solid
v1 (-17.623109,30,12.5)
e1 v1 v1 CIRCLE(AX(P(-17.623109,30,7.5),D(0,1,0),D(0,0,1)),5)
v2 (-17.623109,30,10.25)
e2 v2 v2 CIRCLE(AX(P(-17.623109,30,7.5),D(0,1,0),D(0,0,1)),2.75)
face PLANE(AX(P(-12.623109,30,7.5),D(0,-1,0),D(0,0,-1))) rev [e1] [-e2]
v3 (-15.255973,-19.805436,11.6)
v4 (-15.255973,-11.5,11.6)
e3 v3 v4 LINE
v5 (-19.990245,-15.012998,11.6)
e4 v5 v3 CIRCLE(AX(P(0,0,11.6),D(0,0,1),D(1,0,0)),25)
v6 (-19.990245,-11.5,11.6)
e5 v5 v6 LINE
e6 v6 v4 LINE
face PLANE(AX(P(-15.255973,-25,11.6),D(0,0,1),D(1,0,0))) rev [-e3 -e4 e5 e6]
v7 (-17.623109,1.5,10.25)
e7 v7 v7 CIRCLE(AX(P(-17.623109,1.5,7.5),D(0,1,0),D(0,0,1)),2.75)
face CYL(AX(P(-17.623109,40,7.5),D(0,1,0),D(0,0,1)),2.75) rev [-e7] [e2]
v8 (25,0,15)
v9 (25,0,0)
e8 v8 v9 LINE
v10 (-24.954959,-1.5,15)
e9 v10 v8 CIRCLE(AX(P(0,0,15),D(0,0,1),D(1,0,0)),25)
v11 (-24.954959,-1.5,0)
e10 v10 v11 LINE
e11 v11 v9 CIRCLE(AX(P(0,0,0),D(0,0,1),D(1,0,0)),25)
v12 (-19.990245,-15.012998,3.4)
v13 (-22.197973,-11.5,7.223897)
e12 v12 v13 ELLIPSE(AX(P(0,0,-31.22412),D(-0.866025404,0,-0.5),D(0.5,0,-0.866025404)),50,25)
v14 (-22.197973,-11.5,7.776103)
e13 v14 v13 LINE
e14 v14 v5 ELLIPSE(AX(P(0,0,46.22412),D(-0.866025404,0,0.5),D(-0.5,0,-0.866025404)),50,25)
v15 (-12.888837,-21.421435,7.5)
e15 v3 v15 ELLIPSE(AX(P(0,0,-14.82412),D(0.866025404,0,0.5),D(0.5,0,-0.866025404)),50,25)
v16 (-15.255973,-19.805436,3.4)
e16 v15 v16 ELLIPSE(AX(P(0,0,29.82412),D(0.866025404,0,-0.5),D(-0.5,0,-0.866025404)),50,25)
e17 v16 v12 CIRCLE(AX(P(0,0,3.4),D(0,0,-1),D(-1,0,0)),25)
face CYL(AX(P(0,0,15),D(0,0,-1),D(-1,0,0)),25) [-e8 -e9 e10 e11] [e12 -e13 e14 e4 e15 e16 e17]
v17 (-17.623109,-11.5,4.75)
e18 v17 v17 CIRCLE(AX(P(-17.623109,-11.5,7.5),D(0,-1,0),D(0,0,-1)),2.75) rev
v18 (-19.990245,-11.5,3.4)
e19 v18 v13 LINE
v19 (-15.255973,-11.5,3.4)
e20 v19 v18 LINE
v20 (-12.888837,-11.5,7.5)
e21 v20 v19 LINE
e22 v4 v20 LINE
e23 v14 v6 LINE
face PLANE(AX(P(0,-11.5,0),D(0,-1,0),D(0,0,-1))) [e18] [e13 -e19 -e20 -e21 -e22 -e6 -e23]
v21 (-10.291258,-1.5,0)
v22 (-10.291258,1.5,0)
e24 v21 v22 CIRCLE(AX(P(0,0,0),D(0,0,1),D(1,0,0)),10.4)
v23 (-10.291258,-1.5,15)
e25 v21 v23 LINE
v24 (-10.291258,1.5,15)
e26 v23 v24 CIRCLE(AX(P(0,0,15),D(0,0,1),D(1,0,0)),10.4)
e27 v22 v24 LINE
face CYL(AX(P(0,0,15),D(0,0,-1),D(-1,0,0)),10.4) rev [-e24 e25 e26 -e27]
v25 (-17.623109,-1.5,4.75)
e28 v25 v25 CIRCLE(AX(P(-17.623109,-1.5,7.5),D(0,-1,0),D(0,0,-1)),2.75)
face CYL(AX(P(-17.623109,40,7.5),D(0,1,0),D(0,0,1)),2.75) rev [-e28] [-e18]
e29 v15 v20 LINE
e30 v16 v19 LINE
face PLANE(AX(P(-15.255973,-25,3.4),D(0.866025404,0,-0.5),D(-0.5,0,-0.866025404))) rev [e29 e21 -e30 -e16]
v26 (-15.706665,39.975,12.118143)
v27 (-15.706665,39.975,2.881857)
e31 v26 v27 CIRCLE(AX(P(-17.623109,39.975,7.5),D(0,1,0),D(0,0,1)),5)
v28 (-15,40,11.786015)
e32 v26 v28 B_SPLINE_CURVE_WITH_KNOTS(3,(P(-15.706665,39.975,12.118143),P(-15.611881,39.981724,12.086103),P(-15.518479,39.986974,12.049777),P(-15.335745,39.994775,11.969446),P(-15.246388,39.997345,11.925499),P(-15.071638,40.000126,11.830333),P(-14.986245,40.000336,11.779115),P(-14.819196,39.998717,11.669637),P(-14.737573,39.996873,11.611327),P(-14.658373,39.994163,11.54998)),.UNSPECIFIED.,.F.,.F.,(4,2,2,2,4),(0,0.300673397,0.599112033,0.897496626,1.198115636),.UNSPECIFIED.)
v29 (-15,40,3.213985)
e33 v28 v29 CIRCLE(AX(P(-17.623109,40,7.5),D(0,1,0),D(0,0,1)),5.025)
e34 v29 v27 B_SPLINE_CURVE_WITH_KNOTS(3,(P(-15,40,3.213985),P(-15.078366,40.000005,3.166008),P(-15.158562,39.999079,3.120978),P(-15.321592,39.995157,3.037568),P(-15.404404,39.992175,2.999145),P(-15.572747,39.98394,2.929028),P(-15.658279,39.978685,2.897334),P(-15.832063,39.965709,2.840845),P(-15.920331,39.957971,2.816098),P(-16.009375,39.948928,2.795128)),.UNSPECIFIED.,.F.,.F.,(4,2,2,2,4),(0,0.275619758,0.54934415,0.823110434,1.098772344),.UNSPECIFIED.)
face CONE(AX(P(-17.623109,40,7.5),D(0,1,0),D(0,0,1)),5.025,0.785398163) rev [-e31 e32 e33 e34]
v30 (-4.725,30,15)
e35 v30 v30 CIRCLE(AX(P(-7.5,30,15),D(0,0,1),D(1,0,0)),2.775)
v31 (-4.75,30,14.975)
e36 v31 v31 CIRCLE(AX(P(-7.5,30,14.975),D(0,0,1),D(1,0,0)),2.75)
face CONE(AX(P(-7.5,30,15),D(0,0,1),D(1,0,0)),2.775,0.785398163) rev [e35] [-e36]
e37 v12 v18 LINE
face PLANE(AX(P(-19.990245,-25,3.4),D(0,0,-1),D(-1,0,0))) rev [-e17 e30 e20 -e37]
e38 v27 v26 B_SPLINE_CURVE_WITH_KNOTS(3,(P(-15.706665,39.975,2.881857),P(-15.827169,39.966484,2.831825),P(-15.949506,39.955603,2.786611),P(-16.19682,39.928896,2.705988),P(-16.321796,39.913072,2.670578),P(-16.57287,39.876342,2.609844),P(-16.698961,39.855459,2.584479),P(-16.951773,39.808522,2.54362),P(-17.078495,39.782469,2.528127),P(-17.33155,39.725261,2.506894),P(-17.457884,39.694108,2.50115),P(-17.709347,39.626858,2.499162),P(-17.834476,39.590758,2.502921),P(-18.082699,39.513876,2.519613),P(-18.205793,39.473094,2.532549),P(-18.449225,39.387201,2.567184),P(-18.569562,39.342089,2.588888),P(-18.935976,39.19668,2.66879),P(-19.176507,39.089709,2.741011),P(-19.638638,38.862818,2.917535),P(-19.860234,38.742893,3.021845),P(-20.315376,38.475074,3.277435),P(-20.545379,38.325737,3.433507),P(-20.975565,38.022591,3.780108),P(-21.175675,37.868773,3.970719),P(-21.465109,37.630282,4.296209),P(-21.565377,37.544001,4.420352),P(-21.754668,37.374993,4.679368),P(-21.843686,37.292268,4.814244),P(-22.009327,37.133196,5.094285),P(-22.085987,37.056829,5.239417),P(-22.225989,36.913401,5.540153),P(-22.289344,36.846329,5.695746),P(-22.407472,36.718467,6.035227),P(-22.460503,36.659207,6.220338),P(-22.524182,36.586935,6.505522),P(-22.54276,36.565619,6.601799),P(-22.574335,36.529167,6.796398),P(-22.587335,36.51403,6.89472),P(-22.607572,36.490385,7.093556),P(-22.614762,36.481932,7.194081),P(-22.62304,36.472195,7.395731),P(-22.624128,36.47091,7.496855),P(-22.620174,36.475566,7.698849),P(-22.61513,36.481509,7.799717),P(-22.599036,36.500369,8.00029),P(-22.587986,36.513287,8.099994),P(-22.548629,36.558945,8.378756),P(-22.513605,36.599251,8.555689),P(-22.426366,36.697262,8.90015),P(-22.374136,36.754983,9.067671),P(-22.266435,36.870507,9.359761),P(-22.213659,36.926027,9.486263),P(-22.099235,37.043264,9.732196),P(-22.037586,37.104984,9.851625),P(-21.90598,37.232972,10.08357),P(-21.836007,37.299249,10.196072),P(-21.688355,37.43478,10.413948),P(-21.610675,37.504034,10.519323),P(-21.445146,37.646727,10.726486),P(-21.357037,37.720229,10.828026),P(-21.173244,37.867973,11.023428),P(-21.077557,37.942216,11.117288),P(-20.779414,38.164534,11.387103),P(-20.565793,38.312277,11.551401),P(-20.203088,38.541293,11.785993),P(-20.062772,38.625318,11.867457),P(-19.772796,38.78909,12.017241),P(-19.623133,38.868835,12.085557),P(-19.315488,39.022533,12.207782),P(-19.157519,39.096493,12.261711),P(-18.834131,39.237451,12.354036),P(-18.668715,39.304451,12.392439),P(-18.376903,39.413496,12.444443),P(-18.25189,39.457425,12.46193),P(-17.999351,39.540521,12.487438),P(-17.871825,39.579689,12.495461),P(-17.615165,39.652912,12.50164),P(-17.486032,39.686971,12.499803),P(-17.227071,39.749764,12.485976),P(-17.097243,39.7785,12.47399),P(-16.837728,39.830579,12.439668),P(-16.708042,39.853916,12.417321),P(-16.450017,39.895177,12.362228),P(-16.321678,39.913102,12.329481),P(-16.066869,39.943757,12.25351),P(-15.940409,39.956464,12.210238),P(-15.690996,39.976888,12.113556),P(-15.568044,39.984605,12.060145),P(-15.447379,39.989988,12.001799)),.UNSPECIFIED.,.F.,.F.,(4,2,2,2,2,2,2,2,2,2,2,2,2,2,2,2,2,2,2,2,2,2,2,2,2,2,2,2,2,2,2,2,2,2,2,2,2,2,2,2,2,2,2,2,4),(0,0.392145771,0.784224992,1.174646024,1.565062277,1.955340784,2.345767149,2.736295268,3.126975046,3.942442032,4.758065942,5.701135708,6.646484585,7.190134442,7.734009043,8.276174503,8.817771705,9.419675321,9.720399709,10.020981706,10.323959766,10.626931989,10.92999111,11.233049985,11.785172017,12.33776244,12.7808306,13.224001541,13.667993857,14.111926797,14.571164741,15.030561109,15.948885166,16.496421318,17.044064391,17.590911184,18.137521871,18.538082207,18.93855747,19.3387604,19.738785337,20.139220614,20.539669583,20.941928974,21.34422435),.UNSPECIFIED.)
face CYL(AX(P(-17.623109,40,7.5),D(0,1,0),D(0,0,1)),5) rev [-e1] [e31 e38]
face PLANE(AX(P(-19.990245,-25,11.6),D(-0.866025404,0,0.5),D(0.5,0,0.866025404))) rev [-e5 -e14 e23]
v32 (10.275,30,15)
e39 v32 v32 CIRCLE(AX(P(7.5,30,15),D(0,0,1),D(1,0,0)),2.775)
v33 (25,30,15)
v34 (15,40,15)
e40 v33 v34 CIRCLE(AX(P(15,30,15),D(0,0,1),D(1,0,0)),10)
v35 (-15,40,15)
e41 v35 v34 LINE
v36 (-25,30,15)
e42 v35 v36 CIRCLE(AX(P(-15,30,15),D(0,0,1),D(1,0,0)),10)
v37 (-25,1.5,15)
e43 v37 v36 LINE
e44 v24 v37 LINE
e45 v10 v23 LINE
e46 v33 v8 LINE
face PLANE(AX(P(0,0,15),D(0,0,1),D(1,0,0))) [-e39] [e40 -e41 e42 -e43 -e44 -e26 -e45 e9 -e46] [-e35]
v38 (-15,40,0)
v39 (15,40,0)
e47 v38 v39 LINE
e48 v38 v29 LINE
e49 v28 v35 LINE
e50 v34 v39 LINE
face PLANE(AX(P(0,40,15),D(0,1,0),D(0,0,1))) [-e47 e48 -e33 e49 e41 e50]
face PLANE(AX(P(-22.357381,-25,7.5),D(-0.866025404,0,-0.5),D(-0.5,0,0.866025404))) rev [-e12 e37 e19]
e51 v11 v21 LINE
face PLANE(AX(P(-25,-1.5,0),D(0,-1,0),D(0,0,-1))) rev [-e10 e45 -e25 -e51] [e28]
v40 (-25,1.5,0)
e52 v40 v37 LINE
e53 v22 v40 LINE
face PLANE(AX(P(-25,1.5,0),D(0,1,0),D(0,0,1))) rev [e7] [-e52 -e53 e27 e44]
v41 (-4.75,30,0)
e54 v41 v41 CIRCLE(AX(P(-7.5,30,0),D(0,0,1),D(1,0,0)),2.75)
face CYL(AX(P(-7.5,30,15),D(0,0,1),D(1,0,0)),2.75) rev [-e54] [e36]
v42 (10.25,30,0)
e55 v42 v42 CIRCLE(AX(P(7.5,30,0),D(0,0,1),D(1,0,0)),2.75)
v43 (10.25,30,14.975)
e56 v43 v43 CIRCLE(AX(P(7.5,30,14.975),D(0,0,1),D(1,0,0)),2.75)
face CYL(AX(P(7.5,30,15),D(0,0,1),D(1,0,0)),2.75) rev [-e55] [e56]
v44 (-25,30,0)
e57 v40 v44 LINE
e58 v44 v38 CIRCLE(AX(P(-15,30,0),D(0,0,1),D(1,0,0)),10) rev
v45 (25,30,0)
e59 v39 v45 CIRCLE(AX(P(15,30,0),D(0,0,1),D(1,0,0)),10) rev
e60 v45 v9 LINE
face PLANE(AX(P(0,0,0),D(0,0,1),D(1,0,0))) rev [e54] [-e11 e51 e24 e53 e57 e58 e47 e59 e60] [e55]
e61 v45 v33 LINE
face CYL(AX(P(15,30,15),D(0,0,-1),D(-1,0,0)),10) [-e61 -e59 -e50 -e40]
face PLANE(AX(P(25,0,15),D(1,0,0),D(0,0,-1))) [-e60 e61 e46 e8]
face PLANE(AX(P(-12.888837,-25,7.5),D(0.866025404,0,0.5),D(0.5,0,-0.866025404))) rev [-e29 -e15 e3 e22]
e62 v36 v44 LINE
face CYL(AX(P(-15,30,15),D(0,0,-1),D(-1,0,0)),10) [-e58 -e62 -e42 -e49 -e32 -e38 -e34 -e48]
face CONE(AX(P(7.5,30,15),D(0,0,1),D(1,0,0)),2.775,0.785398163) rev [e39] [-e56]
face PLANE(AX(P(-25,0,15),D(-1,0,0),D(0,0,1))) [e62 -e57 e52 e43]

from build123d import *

# Parameters (mm, degrees)
BOSS_EXTRUDE1_DEPTH            = 15
SKETCH3_W                      = 14.708741574
SKETCH3_H                      = 3
CUT_EXTRUDE1_DEPTH             = 50.497474683
M5_CLEARANCE_HOLE1_D           = 5.5
M5_CLEARANCE_HOLE1_CSINK_D     = 5.55
M5_CLEARANCE_HOLE1_CSINK_ANGLE = 90
FILLET1_R                      = 10
CUT_EXTRUDE2_DEPTH             = 60.179810901


with BuildPart() as part:
    # Sketch2 → Boss-Extrude1 (new body)
    with BuildSketch(Plane.XY):
        with BuildLine():
            Line((-25, 40), (-25, 0))
            ThreePointArc((-25, 0), (0, 25), (25, 0))
            Line((25, 0), (25, 40))
            Line((25, 40), (-25, 40))
        make_face()
        with BuildLine():
            ThreePointArc((25, 0), (0, 25), (-25, 0))
            Line((-25, 0), (-10.4, 0))
            ThreePointArc((-10.4, 0), (0, 10.4), (10.4, 0))
            Line((10.4, 0), (25, 0))
        make_face()
        with BuildLine():
            Line((-10.4, 0), (-25, 0))
            ThreePointArc((-25, 0), (0, -25), (25, 0))
            Line((25, 0), (10.4, 0))
            ThreePointArc((10.4, 0), (0, -10.4), (-10.4, 0))
        make_face()
    extrude(amount=BOSS_EXTRUDE1_DEPTH)

    # Sketch3 → Cut-Extrude1 (cut, through all)
    with BuildSketch(Plane.XY.offset(15)):
        with Locations((-17.645629213, 0)):
            Rectangle(SKETCH3_W, SKETCH3_H)
    extrude(amount=-CUT_EXTRUDE1_DEPTH, mode=Mode.SUBTRACT)

    # Sketch10 → CBORE for M5 SHCS3 (revolve, cut)
    with BuildSketch(Plane(origin=(-17.623108927, 40, 7.5), x_dir=(0, 0, 1), z_dir=(1, 0, 0))):
        Polygon((0, 0), (0, 65), (2.75, 65), (2.75, 10), (5, 10), (5, 0.025), (5.025, 0), align=None)
    revolve(axis=Axis((-17.623108927, 46.35, 7.5), (0, -1, 0)), mode=Mode.SUBTRACT)

    # M5 Clearance Hole1 (through all)
    with Locations(Plane.XY.offset(15)):
        with Locations((-7.5, 30), (7.5, 30)):
            CounterSinkHole(M5_CLEARANCE_HOLE1_D / 2, M5_CLEARANCE_HOLE1_CSINK_D / 2, counter_sink_angle=M5_CLEARANCE_HOLE1_CSINK_ANGLE)

    # Fillet1
    # the kernel refuses this fillet: 10 mm, written as the material it takes off along each edge
    with BuildSketch(Plane(origin=(-25, 40, -25), x_dir=(0, -1, 0), z_dir=(0, 0, 1))) as fillet1_piece_1:
        with BuildLine():
            CenterArc((FILLET1_R, FILLET1_R), FILLET1_R, 180, 90)
            Line((0, FILLET1_R), (0, 0))
            Line((0, 0), (FILLET1_R, 0))
        make_face()
    extrude(amount=65, mode=Mode.SUBTRACT)
    with BuildSketch(Plane(origin=(25, 40, -25), x_dir=(0, -1, 0), z_dir=(0, 0, 1))) as fillet1_piece_2:
        with BuildLine():
            CenterArc((FILLET1_R, -FILLET1_R), FILLET1_R, 90, 90)
            Line((0, -FILLET1_R), (0, 0))
            Line((0, 0), (FILLET1_R, 0))
        make_face()
    extrude(amount=65, mode=Mode.SUBTRACT)

    # Sketch18 → Cut-Extrude2 (cut, through all)
    with BuildSketch(Plane(origin=(0, -11.5, 0), x_dir=(1, 0, 0), z_dir=(0, 1, 0))):
        Polygon((-19.99024503, -3.4), (-15.255972823, -3.4), (-12.888836719, -7.5), (-15.255972823, -11.6), (-19.99024503, -11.6), (-22.357381134, -7.5), align=None)
    extrude(amount=-CUT_EXTRUDE2_DEPTH, mode=Mode.SUBTRACT)


solid = part.part
